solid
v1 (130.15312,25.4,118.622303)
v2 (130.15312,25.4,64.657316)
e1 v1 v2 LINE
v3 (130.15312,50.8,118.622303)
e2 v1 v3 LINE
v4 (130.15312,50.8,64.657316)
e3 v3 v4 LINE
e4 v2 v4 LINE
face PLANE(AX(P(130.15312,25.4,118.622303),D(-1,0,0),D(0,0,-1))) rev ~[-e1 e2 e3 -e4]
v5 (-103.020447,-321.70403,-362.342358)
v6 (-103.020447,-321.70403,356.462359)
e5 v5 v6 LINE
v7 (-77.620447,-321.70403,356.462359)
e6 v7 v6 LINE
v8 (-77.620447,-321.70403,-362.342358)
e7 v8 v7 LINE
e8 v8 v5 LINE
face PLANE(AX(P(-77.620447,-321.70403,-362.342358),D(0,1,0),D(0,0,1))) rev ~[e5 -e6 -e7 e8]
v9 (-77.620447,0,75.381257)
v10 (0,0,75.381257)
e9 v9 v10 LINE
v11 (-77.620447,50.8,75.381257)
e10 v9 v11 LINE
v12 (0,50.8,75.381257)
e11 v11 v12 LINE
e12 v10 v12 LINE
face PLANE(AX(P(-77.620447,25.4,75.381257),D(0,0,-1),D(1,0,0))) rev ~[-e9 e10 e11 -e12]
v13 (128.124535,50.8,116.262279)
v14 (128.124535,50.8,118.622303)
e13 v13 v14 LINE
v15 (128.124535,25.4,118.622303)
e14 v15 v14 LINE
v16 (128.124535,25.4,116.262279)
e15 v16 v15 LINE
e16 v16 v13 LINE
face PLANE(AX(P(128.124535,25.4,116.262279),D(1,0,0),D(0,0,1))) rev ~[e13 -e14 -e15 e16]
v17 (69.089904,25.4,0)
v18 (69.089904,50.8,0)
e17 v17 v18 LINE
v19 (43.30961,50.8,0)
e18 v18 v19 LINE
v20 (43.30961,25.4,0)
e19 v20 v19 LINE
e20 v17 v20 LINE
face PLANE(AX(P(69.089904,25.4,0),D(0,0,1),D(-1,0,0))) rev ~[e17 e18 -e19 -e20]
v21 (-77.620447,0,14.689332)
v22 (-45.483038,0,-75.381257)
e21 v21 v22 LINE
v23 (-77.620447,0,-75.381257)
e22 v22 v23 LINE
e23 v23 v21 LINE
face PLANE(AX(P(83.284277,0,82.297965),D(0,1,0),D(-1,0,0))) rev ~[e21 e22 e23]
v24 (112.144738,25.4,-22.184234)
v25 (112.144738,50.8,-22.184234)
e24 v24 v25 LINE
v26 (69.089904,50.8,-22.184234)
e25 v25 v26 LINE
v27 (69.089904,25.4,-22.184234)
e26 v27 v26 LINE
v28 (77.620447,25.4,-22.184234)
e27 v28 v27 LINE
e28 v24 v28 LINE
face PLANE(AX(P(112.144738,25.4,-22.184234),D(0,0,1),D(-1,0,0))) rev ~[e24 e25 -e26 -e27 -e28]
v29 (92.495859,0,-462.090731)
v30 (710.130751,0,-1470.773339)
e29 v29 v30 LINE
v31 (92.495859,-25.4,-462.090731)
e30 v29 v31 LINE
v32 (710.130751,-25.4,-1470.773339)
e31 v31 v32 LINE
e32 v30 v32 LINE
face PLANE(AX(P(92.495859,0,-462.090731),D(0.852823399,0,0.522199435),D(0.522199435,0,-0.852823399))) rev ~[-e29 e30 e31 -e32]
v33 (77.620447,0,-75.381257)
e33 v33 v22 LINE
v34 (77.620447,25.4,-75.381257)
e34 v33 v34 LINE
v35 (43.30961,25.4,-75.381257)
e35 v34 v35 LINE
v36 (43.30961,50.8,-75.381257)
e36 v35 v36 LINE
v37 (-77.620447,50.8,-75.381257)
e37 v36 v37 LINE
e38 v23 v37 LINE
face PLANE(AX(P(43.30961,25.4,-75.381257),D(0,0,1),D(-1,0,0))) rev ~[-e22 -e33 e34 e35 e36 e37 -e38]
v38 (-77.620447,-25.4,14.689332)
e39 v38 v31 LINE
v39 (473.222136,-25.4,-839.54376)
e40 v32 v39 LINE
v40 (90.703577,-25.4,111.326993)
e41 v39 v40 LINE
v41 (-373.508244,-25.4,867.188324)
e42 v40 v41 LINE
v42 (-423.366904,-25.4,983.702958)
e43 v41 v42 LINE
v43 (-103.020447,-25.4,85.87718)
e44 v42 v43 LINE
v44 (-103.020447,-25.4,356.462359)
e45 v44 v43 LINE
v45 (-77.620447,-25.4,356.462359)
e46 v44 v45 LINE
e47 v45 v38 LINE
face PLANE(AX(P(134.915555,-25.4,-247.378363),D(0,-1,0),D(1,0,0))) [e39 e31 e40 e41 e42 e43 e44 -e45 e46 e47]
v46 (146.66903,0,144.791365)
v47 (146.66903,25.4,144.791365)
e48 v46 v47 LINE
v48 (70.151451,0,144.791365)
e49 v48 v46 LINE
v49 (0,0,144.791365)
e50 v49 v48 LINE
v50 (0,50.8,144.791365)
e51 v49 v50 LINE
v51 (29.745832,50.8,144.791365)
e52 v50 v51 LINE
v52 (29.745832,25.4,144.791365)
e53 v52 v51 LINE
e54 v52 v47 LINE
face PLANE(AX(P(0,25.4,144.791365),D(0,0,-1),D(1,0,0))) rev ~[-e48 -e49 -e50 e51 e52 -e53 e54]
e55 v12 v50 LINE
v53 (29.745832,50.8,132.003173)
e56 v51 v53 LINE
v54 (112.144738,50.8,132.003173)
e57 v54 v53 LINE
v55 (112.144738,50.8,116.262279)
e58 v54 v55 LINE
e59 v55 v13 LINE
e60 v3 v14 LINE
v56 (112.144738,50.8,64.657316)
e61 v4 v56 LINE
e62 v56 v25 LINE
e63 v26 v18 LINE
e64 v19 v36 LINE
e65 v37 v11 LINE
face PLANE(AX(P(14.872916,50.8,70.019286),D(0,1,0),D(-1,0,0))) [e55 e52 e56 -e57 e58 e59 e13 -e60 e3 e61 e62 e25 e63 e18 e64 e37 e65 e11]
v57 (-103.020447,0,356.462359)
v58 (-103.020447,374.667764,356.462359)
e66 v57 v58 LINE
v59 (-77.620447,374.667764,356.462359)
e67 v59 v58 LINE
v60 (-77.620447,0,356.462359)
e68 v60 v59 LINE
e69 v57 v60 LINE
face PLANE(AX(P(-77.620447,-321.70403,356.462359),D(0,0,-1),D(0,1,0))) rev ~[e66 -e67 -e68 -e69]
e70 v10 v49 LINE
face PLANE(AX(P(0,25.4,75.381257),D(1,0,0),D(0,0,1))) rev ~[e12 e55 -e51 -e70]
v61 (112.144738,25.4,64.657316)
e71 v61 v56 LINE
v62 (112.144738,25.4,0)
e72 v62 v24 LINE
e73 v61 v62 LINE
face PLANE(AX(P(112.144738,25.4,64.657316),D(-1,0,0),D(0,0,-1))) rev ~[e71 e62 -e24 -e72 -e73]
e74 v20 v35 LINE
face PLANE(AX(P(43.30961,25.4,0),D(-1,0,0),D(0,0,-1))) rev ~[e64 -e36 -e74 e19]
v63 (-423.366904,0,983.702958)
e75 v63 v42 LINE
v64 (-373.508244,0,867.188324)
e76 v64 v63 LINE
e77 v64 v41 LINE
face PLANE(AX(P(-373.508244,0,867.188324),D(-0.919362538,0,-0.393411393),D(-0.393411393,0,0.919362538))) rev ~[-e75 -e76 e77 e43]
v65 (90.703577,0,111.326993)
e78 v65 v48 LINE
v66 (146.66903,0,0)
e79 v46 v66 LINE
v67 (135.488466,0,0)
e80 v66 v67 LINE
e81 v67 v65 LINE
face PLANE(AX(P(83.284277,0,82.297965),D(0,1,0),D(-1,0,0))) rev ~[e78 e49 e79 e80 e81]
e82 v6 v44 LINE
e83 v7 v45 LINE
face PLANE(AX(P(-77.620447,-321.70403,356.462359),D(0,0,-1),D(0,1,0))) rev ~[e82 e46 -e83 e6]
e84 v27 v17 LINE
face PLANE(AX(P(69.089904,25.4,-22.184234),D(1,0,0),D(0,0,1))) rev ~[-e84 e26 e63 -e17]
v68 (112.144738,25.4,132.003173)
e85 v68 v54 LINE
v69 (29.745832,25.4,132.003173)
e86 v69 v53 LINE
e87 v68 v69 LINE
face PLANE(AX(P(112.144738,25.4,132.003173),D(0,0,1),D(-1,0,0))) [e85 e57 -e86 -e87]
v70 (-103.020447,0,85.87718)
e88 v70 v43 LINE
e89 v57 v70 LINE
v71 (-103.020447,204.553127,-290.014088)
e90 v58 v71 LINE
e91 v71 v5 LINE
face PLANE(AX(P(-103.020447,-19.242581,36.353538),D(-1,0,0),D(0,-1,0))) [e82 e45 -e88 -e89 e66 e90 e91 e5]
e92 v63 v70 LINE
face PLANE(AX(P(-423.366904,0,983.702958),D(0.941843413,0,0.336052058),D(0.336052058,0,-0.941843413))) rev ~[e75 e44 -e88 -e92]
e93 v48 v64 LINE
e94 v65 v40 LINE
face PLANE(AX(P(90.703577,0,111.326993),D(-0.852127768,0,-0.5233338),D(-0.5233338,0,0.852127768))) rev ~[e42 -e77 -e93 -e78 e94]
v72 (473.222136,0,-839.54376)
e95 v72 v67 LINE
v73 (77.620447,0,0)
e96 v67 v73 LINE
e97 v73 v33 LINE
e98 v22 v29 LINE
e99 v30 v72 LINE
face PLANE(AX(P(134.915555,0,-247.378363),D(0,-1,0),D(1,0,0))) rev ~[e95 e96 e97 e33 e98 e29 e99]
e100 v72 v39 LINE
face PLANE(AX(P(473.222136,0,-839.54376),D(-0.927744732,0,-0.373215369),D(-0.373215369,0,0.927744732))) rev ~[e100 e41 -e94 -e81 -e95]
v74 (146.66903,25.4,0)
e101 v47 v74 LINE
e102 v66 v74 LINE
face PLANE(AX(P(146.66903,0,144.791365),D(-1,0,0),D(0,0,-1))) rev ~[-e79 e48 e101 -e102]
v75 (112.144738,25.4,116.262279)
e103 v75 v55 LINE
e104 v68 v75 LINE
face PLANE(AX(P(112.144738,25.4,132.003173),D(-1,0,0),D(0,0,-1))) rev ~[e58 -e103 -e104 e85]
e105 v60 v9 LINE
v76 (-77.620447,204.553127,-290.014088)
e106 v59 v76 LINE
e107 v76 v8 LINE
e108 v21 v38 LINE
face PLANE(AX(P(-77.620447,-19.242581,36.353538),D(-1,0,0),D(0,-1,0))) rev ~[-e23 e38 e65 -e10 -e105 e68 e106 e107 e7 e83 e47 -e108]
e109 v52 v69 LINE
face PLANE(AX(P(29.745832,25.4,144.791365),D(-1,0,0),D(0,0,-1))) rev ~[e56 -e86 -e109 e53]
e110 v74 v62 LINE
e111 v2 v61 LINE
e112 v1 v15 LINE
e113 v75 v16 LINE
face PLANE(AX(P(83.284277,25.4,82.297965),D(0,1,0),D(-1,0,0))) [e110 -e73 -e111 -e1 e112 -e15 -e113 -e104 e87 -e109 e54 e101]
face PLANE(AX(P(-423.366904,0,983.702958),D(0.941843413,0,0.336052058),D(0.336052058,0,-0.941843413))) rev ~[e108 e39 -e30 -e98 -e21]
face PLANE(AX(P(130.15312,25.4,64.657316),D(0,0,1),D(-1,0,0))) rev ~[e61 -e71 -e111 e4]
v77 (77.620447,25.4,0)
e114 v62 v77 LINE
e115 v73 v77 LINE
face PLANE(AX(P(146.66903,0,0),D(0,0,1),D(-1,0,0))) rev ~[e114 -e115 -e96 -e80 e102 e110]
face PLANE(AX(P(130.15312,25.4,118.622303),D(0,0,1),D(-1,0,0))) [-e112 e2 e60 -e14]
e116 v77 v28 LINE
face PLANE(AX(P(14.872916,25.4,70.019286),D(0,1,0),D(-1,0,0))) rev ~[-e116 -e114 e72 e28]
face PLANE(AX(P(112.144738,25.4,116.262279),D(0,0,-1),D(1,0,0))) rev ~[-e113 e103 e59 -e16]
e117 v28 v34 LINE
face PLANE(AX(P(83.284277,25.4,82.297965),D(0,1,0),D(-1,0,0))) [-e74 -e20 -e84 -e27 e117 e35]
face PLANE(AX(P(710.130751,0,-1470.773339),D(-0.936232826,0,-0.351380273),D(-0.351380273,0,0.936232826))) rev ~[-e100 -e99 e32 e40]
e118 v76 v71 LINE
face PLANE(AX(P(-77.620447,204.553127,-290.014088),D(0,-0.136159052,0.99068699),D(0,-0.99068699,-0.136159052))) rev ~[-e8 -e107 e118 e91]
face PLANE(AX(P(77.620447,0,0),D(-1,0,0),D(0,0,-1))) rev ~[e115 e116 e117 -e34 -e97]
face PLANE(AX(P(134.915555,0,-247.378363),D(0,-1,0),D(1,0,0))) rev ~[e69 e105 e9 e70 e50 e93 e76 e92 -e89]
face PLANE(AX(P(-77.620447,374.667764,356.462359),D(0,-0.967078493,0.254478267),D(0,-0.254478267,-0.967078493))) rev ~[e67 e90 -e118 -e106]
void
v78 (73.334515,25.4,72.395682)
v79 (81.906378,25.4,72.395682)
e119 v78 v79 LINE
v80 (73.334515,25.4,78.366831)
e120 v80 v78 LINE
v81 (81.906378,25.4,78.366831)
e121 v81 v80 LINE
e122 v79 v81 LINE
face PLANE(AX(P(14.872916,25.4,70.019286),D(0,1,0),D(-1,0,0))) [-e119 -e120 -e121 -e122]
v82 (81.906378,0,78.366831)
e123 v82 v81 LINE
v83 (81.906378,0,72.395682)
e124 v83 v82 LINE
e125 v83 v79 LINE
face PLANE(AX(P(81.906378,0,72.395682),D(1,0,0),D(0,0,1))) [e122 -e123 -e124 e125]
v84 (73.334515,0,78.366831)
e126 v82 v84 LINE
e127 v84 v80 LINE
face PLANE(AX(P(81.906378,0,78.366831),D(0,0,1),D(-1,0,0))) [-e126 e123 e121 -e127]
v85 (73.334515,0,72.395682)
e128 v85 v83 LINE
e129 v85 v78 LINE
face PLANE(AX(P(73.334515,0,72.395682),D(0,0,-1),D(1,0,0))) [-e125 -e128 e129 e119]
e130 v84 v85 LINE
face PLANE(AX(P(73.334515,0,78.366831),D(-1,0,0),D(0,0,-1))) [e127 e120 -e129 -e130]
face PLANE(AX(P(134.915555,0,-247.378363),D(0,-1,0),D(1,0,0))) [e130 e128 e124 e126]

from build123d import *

# Parameters (mm, degrees)
F1_DEPTH = 25.4
F3_DEPTH = 25.4
F4_W     = 29.7458320856
F4_H     = 10.7239410281
F4_W_2   = 77.620446682
F4_W_3   = 25.7802940905
F4_H_2   = 64.6573156118
F4_W_4   = 82.3989063501
F4_H_3   = 15.7408937812
F4_W_5   = 43.0548340082
F4_H_4   = 22.1842341125
F4_W_6   = 2.0285844803
F4_H_5   = 2.3600235581
F5_DEPTH = 25.4
F7_DEPTH = 25.4


with BuildPart() as f1:
    # F0 (on Front) → F1 (new body)
    with BuildSketch(Plane.XZ):
        Polygon((90.7035768032, 111.3269925117), (-373.5082440503, 867.1883240136), (-423.3669042587, 983.7029576302), (92.4958586693, -462.0907306671), (710.130751133, -1470.7733392715), (473.2221364975, -839.5437598228), align=None)
    extrude(amount=F1_DEPTH)

    # F2 (on face) → F3 (join)
    with BuildSketch(Plane(origin=(0, 0, 0), x_dir=(-1, 0, 0), z_dir=(0, 1, 0))):
        Polygon((-81.9063782692, 78.366830945), (-73.3345150948, 78.366830945), (-73.3345150948, 75.38125664), (0, 75.38125664), (0, 144.7913646698), (-146.6690301895, 144.7913646698), (-146.6690301895, 0), (-77.620446682, 0), (-77.620446682, 72.3956823349), (-81.9063782692, 72.3956823349), align=None)
        Polygon((0, 75.38125664), (-73.3345150948, 75.38125664), (-73.3345150948, 72.3956823349), (-77.620446682, 72.3956823349), (-77.620446682, 0), (0, 0), align=None)
        Polygon((77.620446682, 75.38125664), (0, 75.38125664), (0, 0), (-77.620446682, 0), (-77.620446682, -75.38125664), (77.620446682, -75.38125664), align=None)
    extrude(amount=F3_DEPTH)

    # F4 (on face) → F5 (join)
    with BuildSketch(Plane(origin=(0, 25.4, 0), x_dir=(-1, 0, 0), z_dir=(0, 1, 0))):
        with Locations((-14.8729160428, 70.0192861259)):
            Rectangle(F4_W, F4_H)
        Polygon((-43.309610337, 64.6573156118), (-29.7458320856, 64.6573156118), (-29.7458320856, 75.38125664), (-29.7458320856, 116.2622794509), (-112.1447384357, 116.2622794509), (-112.1447384357, 64.6573156118), (-69.0899044275, 64.6573156118), align=None)
        Polygon((0, 64.6573156118), (-29.7458320856, 64.6573156118), (-43.309610337, 64.6573156118), (-43.309610337, 0), (-43.309610337, -75.38125664), (77.620446682, -75.38125664), (77.620446682, 64.6573156118), align=None)
        with Locations((38.810223341, 70.0192861259)):
            Rectangle(F4_W_2, F4_H)
        Polygon((-29.7458320856, 116.2622794509), (-29.7458320856, 75.38125664), (0, 75.38125664), (0, 144.7913646698), (-29.7458320856, 144.7913646698), (-29.7458320856, 132.0031732321), align=None)
        with Locations((-56.1997573823, 32.3286578059)):
            Rectangle(F4_W_3, F4_H_2)
        with Locations((-70.9452852607, 124.1327263415)):
            Rectangle(F4_W_4, F4_H_3)
        with Locations((-90.6173214316, 32.3286578059)):
            Rectangle(F4_W_5, F4_H_2)
        Polygon((-112.1447384357, 64.6573156118), (-112.1447384357, 116.2622794509), (-128.1245350838, 116.2622794509), (-130.1531195641, 116.2622794509), (-130.1531195641, 64.6573156118), align=None)
        with Locations((-90.6173214316, -11.0921170563)):
            Rectangle(F4_W_5, F4_H_4)
        with Locations((-129.1388273239, 117.44229123)):
            Rectangle(F4_W_6, F4_H_5)
    extrude(amount=F5_DEPTH)

    # F6 (on face) → F7 (join)
    with BuildSketch(Plane(origin=(-77.620446682, 0, 0), x_dir=(0, -1, 0), z_dir=(-1, 0, 0))):
        Polygon((321.7040300369, 356.4623594284), (-374.66776371, 356.4623594284), (-204.5531272888, -290.0140881538), (321.7040300369, -362.3423576355), align=None)
    extrude(amount=F7_DEPTH)


solid = f1.part
